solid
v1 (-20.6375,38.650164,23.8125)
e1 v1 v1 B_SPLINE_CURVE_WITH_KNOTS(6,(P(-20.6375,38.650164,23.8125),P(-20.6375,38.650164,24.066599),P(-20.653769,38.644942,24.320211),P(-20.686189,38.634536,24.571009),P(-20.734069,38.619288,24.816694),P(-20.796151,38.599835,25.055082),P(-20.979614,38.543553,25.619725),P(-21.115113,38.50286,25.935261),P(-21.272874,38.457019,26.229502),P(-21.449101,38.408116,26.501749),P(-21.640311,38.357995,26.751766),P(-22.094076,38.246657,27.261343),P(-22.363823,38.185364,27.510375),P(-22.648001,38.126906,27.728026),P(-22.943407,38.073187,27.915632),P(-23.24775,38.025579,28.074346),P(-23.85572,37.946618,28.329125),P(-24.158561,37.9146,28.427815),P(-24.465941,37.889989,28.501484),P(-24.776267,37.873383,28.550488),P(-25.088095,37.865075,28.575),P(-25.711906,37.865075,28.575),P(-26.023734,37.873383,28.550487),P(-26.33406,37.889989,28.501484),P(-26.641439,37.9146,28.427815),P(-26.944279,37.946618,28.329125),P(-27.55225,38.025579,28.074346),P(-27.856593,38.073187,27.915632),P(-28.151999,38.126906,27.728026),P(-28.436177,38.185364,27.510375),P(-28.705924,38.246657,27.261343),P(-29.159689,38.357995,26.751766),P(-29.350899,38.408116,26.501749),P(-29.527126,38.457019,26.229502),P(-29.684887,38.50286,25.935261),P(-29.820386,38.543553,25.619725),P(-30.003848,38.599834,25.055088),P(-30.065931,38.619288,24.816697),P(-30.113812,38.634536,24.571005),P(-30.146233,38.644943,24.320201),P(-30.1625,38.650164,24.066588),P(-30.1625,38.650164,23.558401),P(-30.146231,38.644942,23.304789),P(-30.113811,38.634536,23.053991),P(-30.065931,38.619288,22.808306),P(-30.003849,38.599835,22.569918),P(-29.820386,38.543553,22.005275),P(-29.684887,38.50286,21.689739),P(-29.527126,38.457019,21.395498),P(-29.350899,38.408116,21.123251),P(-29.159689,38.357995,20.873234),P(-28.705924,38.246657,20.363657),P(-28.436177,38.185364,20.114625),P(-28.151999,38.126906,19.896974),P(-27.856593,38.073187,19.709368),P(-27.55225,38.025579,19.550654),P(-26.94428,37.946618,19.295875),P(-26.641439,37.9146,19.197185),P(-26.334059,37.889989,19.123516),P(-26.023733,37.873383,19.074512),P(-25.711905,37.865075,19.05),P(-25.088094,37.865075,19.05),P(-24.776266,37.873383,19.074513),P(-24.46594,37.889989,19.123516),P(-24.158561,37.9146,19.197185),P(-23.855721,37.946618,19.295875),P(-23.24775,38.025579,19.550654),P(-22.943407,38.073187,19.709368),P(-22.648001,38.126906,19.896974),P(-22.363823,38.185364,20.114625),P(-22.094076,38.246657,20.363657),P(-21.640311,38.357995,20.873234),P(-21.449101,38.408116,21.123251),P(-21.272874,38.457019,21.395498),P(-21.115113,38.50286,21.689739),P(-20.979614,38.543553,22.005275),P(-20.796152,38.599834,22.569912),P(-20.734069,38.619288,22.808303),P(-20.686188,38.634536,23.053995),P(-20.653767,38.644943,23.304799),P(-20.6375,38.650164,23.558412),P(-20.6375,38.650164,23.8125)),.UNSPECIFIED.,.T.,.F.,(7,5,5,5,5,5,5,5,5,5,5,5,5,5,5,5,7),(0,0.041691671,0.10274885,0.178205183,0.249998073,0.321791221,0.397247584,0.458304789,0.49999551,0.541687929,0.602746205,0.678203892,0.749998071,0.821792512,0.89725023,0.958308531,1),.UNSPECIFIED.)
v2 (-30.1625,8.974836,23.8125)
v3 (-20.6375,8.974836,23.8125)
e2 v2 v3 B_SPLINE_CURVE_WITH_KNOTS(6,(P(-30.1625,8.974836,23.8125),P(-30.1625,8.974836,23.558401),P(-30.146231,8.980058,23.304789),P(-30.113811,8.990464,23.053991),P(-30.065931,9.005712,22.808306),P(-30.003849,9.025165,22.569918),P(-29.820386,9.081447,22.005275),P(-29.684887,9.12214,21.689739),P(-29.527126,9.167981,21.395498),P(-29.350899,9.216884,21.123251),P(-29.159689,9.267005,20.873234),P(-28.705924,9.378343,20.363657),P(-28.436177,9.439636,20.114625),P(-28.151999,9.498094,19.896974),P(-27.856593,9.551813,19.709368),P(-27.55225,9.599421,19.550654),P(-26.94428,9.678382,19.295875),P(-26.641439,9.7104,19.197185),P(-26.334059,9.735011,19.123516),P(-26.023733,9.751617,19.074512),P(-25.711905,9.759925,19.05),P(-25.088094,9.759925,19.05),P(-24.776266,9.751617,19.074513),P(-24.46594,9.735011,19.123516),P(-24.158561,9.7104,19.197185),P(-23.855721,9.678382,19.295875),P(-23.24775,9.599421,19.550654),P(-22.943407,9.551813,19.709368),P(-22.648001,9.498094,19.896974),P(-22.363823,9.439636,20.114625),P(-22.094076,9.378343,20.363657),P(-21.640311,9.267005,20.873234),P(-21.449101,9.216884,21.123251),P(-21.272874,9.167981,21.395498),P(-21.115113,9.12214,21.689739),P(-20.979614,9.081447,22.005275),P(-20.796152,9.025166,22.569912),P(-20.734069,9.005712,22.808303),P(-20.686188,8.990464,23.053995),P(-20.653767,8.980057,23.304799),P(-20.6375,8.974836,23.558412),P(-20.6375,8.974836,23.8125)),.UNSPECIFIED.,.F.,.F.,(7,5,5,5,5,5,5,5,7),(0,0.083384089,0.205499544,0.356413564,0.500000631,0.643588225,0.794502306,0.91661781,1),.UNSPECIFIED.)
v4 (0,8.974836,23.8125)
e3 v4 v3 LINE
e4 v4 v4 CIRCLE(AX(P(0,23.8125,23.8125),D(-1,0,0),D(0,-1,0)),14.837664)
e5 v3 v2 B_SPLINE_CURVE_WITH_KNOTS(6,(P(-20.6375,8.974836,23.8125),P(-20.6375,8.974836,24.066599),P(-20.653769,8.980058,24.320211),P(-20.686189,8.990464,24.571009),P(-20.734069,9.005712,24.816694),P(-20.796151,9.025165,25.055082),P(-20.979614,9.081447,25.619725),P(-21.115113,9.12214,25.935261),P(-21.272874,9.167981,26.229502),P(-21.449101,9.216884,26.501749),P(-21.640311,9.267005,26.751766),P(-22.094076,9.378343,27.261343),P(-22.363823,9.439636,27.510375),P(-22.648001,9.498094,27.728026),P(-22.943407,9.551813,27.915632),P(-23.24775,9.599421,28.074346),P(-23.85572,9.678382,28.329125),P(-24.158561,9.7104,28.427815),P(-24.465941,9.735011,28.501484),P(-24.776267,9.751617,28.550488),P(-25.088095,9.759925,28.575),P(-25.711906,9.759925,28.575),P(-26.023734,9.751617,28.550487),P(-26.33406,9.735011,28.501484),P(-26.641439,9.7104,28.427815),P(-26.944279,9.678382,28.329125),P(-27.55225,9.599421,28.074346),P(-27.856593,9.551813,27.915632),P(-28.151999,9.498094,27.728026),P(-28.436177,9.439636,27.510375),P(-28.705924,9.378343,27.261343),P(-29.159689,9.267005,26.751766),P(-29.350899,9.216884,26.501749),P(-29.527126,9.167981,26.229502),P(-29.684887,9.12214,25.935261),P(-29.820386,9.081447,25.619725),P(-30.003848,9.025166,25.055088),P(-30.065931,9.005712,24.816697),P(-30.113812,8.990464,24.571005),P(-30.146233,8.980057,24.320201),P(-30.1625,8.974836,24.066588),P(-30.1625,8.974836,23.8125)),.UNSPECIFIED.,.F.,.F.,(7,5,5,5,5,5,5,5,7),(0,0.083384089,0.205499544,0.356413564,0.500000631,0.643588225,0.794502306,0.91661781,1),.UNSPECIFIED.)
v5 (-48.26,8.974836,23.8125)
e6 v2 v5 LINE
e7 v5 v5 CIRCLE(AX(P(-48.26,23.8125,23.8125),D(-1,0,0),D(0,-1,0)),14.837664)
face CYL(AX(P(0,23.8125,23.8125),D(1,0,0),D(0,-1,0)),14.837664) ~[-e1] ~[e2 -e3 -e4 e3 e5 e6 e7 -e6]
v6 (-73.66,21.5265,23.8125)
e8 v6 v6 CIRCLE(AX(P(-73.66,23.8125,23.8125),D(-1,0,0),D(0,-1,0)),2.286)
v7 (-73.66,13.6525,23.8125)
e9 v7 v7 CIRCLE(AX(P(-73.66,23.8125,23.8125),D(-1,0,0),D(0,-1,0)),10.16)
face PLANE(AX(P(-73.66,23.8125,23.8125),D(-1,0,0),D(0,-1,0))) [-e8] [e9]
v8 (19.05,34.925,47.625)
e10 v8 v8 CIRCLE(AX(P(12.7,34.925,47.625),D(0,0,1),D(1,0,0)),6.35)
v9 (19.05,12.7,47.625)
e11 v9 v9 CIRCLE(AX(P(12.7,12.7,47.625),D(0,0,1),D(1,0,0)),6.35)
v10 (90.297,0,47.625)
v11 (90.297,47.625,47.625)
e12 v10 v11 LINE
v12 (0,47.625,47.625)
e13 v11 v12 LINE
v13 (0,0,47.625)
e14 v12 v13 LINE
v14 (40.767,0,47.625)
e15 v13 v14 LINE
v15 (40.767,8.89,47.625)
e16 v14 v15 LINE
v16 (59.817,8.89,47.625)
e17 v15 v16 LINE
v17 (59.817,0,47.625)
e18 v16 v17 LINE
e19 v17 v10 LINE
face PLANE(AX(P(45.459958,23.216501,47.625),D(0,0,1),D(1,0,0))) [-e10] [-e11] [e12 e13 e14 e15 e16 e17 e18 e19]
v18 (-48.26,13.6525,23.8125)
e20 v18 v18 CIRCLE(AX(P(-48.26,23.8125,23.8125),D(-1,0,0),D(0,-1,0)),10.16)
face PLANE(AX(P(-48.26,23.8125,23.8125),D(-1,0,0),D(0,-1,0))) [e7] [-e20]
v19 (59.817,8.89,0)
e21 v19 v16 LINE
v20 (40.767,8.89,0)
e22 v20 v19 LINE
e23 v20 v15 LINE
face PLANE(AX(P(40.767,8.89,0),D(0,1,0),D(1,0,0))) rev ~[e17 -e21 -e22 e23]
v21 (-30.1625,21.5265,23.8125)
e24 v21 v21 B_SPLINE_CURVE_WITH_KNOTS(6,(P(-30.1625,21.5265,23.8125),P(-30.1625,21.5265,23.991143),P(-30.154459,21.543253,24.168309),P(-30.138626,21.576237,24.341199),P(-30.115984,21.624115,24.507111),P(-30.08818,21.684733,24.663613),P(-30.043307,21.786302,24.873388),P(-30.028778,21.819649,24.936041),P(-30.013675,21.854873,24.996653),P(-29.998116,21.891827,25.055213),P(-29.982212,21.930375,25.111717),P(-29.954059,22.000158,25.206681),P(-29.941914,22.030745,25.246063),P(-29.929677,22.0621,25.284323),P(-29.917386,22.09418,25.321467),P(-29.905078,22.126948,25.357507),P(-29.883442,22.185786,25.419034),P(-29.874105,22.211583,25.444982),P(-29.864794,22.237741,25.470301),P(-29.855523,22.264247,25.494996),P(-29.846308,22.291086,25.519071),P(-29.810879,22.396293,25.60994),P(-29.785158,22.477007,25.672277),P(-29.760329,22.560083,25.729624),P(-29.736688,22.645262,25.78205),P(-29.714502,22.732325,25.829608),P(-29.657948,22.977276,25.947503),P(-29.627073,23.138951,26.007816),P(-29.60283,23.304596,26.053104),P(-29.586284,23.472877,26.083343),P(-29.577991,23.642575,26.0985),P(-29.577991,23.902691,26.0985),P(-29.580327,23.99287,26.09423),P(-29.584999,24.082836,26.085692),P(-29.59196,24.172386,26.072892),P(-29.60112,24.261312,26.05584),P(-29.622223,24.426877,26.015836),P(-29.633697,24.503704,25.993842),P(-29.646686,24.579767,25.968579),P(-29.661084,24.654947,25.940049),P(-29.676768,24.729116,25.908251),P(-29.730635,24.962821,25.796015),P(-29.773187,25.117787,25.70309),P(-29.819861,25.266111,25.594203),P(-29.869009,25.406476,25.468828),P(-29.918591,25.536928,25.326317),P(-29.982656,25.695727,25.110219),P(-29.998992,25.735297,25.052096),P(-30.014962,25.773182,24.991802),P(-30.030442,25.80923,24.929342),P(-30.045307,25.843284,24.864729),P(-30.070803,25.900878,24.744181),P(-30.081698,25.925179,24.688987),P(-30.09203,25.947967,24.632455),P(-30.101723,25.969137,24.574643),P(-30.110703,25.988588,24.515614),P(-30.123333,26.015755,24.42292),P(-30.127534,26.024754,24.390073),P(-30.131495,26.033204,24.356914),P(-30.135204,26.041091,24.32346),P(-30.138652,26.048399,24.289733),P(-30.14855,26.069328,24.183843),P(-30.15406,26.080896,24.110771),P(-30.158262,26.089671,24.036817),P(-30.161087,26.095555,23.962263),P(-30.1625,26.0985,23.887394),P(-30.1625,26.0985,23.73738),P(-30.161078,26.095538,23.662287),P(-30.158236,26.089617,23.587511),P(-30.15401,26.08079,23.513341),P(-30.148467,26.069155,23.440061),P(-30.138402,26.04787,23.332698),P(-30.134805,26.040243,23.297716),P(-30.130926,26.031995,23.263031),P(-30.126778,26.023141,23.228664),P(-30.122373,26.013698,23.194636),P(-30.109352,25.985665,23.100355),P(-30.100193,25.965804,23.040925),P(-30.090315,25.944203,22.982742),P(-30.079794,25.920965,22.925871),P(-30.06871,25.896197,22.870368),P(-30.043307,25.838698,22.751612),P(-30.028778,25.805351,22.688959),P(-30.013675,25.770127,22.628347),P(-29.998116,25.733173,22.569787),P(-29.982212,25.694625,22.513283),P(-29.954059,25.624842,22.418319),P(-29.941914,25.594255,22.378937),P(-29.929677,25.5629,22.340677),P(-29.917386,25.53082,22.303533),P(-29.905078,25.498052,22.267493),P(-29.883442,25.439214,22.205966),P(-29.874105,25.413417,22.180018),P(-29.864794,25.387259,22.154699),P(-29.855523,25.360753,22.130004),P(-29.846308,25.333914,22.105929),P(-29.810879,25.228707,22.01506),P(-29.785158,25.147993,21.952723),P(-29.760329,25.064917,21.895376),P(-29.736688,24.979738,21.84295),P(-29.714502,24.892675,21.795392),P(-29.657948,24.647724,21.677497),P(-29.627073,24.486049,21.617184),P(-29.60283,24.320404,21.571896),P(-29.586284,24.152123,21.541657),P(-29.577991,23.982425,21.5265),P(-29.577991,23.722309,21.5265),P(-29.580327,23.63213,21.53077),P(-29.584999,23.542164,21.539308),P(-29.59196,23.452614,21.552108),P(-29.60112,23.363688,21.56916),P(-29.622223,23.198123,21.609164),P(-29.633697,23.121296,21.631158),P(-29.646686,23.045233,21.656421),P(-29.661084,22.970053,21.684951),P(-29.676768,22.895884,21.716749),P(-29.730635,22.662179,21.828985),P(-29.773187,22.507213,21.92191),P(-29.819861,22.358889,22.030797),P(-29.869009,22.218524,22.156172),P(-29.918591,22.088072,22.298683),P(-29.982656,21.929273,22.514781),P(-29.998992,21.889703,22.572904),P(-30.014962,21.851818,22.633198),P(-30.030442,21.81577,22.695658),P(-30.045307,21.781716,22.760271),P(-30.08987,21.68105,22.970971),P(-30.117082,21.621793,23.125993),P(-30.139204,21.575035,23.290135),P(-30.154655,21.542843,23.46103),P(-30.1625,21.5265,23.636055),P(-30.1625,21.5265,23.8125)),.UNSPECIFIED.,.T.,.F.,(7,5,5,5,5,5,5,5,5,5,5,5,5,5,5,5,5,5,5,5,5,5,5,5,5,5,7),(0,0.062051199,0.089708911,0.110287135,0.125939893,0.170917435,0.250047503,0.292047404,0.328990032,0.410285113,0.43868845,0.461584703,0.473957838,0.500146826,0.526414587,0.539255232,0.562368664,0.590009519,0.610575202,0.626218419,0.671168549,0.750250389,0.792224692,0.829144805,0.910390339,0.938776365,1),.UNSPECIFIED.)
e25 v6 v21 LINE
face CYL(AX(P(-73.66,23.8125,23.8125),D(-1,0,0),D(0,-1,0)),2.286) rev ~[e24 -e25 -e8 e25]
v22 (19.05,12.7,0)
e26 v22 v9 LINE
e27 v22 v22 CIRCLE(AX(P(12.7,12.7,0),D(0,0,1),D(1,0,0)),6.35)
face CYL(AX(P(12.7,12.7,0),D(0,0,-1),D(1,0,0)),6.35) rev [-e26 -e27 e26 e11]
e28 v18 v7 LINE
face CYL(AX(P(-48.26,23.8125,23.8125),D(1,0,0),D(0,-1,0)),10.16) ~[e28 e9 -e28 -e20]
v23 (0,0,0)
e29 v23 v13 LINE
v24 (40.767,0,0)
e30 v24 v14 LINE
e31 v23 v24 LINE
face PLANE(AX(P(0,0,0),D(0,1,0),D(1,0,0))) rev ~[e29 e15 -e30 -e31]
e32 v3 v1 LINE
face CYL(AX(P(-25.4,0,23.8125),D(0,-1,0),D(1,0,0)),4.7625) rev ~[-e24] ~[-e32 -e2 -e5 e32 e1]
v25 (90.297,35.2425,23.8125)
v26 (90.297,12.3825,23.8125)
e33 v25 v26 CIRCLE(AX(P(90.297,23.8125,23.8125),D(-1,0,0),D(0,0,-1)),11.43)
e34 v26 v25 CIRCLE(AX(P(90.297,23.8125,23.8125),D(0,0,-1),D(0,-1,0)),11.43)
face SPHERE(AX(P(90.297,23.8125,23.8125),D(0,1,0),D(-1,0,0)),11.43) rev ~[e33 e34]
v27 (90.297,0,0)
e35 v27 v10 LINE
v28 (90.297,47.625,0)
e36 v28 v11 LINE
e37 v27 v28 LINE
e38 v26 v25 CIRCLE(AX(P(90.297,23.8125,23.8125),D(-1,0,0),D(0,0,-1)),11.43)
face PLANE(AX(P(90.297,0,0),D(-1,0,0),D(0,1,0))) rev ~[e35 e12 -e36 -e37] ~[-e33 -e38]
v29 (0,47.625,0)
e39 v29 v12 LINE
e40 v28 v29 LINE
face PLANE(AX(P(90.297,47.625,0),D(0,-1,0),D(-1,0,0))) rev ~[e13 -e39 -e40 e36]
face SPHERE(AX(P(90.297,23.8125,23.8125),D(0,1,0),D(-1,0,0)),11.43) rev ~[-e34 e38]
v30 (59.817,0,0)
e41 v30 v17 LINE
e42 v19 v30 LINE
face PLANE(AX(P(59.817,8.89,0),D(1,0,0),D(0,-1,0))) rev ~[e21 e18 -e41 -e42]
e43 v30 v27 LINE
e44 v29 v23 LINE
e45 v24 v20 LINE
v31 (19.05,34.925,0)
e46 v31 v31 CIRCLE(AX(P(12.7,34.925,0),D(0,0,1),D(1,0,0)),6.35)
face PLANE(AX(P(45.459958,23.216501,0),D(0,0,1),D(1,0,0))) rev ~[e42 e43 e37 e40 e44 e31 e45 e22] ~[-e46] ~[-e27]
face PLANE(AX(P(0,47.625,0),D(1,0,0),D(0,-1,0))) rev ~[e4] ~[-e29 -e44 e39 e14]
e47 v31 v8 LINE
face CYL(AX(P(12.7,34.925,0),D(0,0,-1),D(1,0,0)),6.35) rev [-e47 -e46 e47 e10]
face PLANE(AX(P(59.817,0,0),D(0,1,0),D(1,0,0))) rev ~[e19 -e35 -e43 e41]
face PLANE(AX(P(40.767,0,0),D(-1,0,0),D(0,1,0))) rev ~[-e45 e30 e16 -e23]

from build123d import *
from build123d import SkipClean  # not in build123d's __all__

# Parameters (mm, degrees)
F0_R      = 6.35
F1_DEPTH  = 47.625
F5_R      = 14.8376639977
F6_DEPTH  = 48.26
F7_R      = 10.16
F8_DEPTH  = 25.4
F10_R     = 4.7625
F11_DEPTH = 127
F9_R      = 2.286
F12_DEPTH = 44.083008926


with BuildPart() as f1:
    # F0 (on Top) → F1 (new body)
    with BuildSketch(Plane.XY):
        Polygon((0, 47.625), (0, 0), (40.767, 0), (40.767, 8.89), (59.817, 8.89), (59.817, 0), (90.297, 0), (90.297, 47.625), align=None)
        with Locations((12.7, 12.7)):
            Circle(F0_R, mode=Mode.SUBTRACT)
        with Locations((12.7, 34.925)):
            Circle(F0_R, mode=Mode.SUBTRACT)
    extrude(amount=F1_DEPTH)

    # F3 (on offset) → F4 (revolve, cut)
    with BuildSketch(Plane(origin=(0, 0, 23.8125), x_dir=(1, 0, 0), z_dir=(0, 0, -1))):
        with BuildLine():
            Line((90.297, -35.2425), (90.297, -12.3825))
            ThreePointArc((90.297, -12.3825), (78.867, -23.8125), (90.297, -35.2425))
        make_face()
    with SkipClean():  # cleaning this boolean's faces spoils the solid; the shape is the same uncleaned
        revolve(axis=Axis((90.297, 23.8125, 23.8125), (0, 1, 0)), mode=Mode.SUBTRACT)

    # F5 (on face) → F6 (join)
    with BuildSketch(Plane(origin=(0, 0, 0), x_dir=(0, -1, 0), z_dir=(-1, 0, 0))):
        with Locations((-23.8125, 23.8125)):
            Circle(F5_R)
    with SkipClean():  # cleaning this boolean's faces spoils the solid; the shape is the same uncleaned
        extrude(amount=F6_DEPTH)

    # F7 (on face) → F8 (join)
    with BuildSketch(Plane(origin=(-48.26, 0, 0), x_dir=(0, -1, 0), z_dir=(-1, 0, 0))):
        with Locations((-23.8125, 23.8125)):
            Circle(F7_R)
    with SkipClean():  # cleaning this boolean's faces spoils the solid; the shape is the same uncleaned
        extrude(amount=F8_DEPTH)

    # F10 (on Front) → F11 (cut)
    with BuildSketch(Plane.XZ):
        with Locations((-25.4, 23.8125)):
            Circle(F10_R)
    with SkipClean():  # cleaning this boolean's faces spoils the solid; the shape is the same uncleaned
        extrude(amount=-F11_DEPTH, mode=Mode.SUBTRACT)

    # F9 (on face) → F12 (cut, through all)
    with BuildSketch(Plane(origin=(-73.66, 0, 0), x_dir=(0, -1, 0), z_dir=(-1, 0, 0))):
        with Locations((-23.8125, 23.8125)):
            Circle(F9_R)
    with SkipClean():  # cleaning this boolean's faces spoils the solid; the shape is the same uncleaned
        extrude(amount=-F12_DEPTH, mode=Mode.SUBTRACT)


solid = f1.part
